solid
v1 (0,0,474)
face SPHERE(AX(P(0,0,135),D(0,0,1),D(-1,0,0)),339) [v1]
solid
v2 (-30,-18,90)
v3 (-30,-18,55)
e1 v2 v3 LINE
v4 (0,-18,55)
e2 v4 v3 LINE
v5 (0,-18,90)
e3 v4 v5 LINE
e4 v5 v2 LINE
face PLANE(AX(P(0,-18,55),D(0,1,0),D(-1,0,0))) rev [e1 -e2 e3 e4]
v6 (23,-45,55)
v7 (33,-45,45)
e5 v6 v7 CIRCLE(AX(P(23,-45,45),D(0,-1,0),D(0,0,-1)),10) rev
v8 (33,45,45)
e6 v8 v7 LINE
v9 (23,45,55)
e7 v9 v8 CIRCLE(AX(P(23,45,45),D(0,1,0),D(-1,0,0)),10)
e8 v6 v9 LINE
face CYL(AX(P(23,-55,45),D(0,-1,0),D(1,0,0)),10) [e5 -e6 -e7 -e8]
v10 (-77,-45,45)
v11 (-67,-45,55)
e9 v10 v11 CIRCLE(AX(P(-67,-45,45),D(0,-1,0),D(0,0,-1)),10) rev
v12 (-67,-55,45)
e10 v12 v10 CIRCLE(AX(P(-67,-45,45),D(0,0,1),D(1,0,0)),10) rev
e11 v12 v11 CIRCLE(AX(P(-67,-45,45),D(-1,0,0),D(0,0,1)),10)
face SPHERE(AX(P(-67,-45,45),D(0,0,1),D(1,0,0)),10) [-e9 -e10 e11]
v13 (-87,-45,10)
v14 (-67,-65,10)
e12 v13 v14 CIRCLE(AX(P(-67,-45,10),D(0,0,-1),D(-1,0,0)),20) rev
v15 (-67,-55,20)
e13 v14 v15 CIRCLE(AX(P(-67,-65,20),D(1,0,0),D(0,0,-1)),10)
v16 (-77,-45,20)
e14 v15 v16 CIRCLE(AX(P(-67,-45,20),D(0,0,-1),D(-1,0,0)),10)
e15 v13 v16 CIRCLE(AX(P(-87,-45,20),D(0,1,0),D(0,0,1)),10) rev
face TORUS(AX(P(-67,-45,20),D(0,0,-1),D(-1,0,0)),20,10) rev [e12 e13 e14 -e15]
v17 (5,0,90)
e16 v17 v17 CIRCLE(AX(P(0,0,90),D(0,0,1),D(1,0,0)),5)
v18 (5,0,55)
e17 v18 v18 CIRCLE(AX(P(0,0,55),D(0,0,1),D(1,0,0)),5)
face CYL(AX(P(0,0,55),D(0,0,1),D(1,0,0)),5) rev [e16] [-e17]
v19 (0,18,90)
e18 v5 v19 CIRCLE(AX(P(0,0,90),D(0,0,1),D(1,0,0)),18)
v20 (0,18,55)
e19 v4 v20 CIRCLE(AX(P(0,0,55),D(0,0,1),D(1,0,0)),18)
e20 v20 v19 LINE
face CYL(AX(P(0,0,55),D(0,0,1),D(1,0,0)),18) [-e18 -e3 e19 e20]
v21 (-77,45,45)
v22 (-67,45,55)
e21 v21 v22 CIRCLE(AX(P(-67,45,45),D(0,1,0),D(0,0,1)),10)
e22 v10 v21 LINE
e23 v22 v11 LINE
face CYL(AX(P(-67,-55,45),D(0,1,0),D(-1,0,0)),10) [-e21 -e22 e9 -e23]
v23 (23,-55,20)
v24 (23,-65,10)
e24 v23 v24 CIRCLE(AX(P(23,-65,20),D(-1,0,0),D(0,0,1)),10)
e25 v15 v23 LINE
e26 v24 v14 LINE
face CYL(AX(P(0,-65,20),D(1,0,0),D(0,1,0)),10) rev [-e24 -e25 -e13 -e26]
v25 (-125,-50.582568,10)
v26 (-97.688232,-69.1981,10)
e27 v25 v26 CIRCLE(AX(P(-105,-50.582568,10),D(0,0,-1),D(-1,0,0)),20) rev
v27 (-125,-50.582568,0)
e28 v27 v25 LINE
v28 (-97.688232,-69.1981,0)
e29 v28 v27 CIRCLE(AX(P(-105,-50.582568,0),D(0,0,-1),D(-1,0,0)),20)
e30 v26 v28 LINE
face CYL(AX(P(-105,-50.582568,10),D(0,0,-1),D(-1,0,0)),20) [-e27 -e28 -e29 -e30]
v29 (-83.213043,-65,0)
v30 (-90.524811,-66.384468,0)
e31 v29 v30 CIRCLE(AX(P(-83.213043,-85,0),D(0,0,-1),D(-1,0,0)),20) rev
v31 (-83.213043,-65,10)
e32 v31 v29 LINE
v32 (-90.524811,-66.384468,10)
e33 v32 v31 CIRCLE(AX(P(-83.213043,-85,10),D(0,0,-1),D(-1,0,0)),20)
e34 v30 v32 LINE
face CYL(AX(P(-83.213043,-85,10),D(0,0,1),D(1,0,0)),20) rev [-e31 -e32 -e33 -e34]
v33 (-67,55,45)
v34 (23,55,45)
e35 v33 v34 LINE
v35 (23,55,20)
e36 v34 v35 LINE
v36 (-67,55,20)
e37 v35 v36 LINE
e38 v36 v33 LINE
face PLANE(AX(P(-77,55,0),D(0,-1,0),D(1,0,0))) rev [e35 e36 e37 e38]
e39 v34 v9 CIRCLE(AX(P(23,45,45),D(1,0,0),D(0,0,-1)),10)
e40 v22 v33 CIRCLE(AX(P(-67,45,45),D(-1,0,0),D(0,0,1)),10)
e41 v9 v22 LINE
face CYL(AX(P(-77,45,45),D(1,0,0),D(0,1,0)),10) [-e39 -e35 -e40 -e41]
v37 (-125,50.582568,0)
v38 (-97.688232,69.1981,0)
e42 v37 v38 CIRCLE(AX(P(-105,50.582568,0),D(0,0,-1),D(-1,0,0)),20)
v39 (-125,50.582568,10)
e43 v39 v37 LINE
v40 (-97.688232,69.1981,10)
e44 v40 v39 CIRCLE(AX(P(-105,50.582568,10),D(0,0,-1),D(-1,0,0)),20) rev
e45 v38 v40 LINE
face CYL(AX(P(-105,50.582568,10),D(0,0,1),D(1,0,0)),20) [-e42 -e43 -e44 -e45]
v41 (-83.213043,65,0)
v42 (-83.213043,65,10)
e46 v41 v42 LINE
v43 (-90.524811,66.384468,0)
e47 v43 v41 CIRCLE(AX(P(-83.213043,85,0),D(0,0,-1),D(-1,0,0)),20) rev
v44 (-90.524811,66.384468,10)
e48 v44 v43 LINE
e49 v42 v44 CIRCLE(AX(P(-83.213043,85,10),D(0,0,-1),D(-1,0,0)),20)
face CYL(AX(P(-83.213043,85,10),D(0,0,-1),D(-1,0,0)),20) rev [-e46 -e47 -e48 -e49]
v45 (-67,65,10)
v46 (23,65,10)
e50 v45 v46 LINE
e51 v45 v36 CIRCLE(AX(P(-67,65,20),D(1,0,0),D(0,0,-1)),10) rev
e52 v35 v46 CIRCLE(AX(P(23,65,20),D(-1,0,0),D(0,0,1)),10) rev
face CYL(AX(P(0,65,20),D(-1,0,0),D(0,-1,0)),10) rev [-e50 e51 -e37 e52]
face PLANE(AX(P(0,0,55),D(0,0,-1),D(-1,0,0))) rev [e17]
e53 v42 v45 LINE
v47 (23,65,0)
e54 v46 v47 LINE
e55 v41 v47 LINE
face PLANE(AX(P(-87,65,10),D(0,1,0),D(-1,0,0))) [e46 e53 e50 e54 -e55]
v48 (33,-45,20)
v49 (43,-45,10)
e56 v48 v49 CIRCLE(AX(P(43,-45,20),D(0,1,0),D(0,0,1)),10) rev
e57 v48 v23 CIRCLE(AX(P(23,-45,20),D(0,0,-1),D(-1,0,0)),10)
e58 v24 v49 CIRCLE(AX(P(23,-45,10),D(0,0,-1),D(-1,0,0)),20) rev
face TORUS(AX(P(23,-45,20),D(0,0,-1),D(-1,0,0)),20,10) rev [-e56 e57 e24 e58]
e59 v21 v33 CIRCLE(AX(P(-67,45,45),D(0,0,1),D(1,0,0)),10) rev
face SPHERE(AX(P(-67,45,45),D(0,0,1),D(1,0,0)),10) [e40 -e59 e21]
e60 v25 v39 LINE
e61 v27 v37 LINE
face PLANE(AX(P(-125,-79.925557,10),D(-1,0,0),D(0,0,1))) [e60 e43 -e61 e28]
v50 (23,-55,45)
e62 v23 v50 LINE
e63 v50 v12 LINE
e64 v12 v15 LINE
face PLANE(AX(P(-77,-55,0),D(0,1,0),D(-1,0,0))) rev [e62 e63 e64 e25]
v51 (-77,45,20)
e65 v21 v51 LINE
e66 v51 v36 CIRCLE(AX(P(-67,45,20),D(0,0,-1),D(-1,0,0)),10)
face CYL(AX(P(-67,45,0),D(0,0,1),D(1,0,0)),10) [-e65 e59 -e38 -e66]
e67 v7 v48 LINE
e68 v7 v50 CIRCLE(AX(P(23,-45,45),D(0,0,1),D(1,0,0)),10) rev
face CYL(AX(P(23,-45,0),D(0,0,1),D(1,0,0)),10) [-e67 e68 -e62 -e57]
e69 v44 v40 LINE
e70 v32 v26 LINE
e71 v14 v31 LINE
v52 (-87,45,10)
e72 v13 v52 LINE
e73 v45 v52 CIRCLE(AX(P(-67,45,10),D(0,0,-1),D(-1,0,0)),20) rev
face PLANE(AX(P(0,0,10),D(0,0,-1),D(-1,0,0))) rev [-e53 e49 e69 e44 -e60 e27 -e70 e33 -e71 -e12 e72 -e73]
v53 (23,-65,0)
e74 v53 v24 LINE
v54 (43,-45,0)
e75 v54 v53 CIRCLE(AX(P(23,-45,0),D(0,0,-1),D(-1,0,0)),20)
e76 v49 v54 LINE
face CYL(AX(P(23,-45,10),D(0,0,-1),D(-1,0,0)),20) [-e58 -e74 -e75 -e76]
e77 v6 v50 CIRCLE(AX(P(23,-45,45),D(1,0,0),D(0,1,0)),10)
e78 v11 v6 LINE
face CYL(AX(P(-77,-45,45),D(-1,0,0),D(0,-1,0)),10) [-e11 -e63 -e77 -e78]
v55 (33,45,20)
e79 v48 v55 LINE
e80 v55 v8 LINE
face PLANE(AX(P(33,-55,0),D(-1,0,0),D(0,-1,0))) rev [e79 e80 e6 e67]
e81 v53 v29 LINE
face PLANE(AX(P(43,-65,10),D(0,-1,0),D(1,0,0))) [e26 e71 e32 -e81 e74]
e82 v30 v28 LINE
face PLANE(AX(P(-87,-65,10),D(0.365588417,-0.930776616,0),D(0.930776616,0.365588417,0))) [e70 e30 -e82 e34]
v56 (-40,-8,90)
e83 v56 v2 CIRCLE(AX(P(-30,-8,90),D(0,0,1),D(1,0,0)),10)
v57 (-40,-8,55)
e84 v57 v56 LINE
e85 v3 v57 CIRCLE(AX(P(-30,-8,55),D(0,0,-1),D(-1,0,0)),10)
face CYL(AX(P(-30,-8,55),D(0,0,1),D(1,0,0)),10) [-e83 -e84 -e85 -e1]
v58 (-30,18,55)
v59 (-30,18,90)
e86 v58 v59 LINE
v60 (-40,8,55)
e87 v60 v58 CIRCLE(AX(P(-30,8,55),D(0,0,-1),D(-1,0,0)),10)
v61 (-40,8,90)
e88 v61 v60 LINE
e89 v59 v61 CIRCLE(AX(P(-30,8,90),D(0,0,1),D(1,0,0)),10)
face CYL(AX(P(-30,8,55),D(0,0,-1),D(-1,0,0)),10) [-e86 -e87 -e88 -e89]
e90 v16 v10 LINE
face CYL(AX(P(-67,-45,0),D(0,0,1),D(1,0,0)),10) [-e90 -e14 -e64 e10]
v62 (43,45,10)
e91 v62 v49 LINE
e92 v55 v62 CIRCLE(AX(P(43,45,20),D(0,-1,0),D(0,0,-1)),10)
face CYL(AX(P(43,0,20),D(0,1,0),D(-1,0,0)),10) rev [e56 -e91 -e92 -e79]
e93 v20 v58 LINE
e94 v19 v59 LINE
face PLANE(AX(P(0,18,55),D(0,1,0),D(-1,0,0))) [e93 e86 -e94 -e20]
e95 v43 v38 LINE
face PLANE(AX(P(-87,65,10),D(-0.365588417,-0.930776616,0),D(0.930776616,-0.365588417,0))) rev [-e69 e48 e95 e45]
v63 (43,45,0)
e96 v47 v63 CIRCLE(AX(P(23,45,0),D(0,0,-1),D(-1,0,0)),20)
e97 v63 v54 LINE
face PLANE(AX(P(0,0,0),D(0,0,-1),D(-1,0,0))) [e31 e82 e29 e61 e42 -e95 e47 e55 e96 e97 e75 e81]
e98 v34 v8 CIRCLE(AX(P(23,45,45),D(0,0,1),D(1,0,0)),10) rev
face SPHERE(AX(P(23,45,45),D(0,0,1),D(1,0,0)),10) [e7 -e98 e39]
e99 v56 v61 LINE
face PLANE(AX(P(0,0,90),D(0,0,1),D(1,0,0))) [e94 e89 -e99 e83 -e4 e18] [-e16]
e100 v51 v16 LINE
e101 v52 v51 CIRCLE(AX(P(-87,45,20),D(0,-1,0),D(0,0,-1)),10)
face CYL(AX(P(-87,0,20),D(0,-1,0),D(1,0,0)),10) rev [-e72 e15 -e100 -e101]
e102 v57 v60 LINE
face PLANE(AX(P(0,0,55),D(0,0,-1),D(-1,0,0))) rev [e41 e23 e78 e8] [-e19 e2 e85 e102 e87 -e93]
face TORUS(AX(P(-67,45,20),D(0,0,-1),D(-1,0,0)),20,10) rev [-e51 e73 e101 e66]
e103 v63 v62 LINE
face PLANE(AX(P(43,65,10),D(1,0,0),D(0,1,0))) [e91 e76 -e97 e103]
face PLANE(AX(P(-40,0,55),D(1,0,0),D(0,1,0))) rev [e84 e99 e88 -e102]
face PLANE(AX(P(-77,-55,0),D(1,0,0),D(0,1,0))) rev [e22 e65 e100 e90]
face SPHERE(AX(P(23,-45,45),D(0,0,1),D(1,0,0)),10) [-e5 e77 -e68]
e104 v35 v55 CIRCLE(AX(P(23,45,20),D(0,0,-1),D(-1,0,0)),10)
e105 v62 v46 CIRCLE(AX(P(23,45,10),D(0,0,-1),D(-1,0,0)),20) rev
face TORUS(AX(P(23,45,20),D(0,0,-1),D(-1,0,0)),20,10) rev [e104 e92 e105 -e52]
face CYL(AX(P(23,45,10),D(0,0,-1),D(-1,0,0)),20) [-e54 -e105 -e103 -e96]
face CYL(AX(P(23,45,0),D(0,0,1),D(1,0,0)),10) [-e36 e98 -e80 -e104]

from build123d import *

# Parameters (mm, degrees)
BOSS_EXTRUDE1_DEPTH = 35
SKETCH5_W           = 110
SKETCH5_H           = 110
BOSS_EXTRUDE2_DEPTH = 55
BOSS_EXTRUDE3_DEPTH = 10
FILLET1_R           = 20
FILLET4_R           = 10


with BuildPart() as part:
    # Sketch4 → Boss-Extrude1 (new body)
    with BuildSketch(Plane.XY.offset(90)):
        with BuildLine():
            ThreePointArc((18, 0), (12.727922061, 12.727922061), (0, 18))
            Line((0, 18), (-40, 18))
            Line((-40, 18), (-40, 0))
            Line((-40, 0), (-5, 0))
            ThreePointArc((-5, 0), (0, 5), (5, 0))
            Line((5, 0), (18, 0))
        make_face()
        with BuildLine():
            ThreePointArc((0, -18), (12.727922061, -12.727922061), (18, 0))
            Line((18, 0), (5, 0))
            ThreePointArc((5, 0), (0, -5), (-5, 0))
            Line((-5, 0), (-40, 0))
            Line((-40, 0), (-40, -18))
            Line((-40, -18), (0, -18))
        make_face()
    extrude(amount=-BOSS_EXTRUDE1_DEPTH)

    # Sketch5 → Boss-Extrude2 (add)
    with BuildSketch(Plane(origin=(0, 0, 55), x_dir=(-1, 0, 0), z_dir=(0, 0, -1))):
        with Locations((22, 0)):
            Rectangle(SKETCH5_W, SKETCH5_H)
    extrude(amount=BOSS_EXTRUDE2_DEPTH)

    # Sketch7 → Boss-Extrude3 (add)
    with BuildSketch(Plane(origin=(0, 0, 0), x_dir=(-1, 0, 0), z_dir=(0, 0, -1))):
        Polygon((87, -65), (125, -79.925557452), (125, 79.925557452), (87, 65), (-43, 65), (-43, -65), align=None)
    extrude(amount=-BOSS_EXTRUDE3_DEPTH)

    # Fillet1
    fillet1_edges = [part.edges().sort_by_distance(p)[0] for p in [
        (-125, -79.925557452, 5),
        (-87, -65, 5),
        (43, -65, 5),
        (43, 65, 5),
        (-87, 65, 5),
        (-125, 79.925557452, 5),
    ]]
    fillet(fillet1_edges, radius=FILLET1_R)

    # Fillet4
    fillet4_edges = [part.edges().sort_by_distance(p)[0] for p in [
        (-40, -18, 72.5),
        (-40, 18, 72.5),
        (33, 0, 55),
        (-22, -55, 55),
        (-77, 0, 55),
        (-22, 55, 55),
        (33, -55, 32.5),
        (33, 55, 32.5),
        (33, 0, 10),
        (-77, -55, 32.5),
        (-77, 55, 32.5),
        (-77, 0, 10),
        (-22, 55, 10),
        (-22, -55, 10),
    ]]
    fillet(fillet4_edges, radius=FILLET4_R - 0.0001)  # a hair under: the kernel refuses the full size


with BuildPart() as body_2:
    # Sketch8 → Revolve1 (revolve)
    with BuildSketch(Plane(origin=(0, 0, 0), x_dir=(1, 0, 0), z_dir=(0, 1, 0))):
        with BuildLine():
            Line((0, -474), (0, 204))
            ThreePointArc((0, 204), (339, -135), (0, -474))
        make_face()
    revolve(axis=Axis((0, 0, 474), (0, 0, -1)))


solid = Compound([part.part, body_2.part])
